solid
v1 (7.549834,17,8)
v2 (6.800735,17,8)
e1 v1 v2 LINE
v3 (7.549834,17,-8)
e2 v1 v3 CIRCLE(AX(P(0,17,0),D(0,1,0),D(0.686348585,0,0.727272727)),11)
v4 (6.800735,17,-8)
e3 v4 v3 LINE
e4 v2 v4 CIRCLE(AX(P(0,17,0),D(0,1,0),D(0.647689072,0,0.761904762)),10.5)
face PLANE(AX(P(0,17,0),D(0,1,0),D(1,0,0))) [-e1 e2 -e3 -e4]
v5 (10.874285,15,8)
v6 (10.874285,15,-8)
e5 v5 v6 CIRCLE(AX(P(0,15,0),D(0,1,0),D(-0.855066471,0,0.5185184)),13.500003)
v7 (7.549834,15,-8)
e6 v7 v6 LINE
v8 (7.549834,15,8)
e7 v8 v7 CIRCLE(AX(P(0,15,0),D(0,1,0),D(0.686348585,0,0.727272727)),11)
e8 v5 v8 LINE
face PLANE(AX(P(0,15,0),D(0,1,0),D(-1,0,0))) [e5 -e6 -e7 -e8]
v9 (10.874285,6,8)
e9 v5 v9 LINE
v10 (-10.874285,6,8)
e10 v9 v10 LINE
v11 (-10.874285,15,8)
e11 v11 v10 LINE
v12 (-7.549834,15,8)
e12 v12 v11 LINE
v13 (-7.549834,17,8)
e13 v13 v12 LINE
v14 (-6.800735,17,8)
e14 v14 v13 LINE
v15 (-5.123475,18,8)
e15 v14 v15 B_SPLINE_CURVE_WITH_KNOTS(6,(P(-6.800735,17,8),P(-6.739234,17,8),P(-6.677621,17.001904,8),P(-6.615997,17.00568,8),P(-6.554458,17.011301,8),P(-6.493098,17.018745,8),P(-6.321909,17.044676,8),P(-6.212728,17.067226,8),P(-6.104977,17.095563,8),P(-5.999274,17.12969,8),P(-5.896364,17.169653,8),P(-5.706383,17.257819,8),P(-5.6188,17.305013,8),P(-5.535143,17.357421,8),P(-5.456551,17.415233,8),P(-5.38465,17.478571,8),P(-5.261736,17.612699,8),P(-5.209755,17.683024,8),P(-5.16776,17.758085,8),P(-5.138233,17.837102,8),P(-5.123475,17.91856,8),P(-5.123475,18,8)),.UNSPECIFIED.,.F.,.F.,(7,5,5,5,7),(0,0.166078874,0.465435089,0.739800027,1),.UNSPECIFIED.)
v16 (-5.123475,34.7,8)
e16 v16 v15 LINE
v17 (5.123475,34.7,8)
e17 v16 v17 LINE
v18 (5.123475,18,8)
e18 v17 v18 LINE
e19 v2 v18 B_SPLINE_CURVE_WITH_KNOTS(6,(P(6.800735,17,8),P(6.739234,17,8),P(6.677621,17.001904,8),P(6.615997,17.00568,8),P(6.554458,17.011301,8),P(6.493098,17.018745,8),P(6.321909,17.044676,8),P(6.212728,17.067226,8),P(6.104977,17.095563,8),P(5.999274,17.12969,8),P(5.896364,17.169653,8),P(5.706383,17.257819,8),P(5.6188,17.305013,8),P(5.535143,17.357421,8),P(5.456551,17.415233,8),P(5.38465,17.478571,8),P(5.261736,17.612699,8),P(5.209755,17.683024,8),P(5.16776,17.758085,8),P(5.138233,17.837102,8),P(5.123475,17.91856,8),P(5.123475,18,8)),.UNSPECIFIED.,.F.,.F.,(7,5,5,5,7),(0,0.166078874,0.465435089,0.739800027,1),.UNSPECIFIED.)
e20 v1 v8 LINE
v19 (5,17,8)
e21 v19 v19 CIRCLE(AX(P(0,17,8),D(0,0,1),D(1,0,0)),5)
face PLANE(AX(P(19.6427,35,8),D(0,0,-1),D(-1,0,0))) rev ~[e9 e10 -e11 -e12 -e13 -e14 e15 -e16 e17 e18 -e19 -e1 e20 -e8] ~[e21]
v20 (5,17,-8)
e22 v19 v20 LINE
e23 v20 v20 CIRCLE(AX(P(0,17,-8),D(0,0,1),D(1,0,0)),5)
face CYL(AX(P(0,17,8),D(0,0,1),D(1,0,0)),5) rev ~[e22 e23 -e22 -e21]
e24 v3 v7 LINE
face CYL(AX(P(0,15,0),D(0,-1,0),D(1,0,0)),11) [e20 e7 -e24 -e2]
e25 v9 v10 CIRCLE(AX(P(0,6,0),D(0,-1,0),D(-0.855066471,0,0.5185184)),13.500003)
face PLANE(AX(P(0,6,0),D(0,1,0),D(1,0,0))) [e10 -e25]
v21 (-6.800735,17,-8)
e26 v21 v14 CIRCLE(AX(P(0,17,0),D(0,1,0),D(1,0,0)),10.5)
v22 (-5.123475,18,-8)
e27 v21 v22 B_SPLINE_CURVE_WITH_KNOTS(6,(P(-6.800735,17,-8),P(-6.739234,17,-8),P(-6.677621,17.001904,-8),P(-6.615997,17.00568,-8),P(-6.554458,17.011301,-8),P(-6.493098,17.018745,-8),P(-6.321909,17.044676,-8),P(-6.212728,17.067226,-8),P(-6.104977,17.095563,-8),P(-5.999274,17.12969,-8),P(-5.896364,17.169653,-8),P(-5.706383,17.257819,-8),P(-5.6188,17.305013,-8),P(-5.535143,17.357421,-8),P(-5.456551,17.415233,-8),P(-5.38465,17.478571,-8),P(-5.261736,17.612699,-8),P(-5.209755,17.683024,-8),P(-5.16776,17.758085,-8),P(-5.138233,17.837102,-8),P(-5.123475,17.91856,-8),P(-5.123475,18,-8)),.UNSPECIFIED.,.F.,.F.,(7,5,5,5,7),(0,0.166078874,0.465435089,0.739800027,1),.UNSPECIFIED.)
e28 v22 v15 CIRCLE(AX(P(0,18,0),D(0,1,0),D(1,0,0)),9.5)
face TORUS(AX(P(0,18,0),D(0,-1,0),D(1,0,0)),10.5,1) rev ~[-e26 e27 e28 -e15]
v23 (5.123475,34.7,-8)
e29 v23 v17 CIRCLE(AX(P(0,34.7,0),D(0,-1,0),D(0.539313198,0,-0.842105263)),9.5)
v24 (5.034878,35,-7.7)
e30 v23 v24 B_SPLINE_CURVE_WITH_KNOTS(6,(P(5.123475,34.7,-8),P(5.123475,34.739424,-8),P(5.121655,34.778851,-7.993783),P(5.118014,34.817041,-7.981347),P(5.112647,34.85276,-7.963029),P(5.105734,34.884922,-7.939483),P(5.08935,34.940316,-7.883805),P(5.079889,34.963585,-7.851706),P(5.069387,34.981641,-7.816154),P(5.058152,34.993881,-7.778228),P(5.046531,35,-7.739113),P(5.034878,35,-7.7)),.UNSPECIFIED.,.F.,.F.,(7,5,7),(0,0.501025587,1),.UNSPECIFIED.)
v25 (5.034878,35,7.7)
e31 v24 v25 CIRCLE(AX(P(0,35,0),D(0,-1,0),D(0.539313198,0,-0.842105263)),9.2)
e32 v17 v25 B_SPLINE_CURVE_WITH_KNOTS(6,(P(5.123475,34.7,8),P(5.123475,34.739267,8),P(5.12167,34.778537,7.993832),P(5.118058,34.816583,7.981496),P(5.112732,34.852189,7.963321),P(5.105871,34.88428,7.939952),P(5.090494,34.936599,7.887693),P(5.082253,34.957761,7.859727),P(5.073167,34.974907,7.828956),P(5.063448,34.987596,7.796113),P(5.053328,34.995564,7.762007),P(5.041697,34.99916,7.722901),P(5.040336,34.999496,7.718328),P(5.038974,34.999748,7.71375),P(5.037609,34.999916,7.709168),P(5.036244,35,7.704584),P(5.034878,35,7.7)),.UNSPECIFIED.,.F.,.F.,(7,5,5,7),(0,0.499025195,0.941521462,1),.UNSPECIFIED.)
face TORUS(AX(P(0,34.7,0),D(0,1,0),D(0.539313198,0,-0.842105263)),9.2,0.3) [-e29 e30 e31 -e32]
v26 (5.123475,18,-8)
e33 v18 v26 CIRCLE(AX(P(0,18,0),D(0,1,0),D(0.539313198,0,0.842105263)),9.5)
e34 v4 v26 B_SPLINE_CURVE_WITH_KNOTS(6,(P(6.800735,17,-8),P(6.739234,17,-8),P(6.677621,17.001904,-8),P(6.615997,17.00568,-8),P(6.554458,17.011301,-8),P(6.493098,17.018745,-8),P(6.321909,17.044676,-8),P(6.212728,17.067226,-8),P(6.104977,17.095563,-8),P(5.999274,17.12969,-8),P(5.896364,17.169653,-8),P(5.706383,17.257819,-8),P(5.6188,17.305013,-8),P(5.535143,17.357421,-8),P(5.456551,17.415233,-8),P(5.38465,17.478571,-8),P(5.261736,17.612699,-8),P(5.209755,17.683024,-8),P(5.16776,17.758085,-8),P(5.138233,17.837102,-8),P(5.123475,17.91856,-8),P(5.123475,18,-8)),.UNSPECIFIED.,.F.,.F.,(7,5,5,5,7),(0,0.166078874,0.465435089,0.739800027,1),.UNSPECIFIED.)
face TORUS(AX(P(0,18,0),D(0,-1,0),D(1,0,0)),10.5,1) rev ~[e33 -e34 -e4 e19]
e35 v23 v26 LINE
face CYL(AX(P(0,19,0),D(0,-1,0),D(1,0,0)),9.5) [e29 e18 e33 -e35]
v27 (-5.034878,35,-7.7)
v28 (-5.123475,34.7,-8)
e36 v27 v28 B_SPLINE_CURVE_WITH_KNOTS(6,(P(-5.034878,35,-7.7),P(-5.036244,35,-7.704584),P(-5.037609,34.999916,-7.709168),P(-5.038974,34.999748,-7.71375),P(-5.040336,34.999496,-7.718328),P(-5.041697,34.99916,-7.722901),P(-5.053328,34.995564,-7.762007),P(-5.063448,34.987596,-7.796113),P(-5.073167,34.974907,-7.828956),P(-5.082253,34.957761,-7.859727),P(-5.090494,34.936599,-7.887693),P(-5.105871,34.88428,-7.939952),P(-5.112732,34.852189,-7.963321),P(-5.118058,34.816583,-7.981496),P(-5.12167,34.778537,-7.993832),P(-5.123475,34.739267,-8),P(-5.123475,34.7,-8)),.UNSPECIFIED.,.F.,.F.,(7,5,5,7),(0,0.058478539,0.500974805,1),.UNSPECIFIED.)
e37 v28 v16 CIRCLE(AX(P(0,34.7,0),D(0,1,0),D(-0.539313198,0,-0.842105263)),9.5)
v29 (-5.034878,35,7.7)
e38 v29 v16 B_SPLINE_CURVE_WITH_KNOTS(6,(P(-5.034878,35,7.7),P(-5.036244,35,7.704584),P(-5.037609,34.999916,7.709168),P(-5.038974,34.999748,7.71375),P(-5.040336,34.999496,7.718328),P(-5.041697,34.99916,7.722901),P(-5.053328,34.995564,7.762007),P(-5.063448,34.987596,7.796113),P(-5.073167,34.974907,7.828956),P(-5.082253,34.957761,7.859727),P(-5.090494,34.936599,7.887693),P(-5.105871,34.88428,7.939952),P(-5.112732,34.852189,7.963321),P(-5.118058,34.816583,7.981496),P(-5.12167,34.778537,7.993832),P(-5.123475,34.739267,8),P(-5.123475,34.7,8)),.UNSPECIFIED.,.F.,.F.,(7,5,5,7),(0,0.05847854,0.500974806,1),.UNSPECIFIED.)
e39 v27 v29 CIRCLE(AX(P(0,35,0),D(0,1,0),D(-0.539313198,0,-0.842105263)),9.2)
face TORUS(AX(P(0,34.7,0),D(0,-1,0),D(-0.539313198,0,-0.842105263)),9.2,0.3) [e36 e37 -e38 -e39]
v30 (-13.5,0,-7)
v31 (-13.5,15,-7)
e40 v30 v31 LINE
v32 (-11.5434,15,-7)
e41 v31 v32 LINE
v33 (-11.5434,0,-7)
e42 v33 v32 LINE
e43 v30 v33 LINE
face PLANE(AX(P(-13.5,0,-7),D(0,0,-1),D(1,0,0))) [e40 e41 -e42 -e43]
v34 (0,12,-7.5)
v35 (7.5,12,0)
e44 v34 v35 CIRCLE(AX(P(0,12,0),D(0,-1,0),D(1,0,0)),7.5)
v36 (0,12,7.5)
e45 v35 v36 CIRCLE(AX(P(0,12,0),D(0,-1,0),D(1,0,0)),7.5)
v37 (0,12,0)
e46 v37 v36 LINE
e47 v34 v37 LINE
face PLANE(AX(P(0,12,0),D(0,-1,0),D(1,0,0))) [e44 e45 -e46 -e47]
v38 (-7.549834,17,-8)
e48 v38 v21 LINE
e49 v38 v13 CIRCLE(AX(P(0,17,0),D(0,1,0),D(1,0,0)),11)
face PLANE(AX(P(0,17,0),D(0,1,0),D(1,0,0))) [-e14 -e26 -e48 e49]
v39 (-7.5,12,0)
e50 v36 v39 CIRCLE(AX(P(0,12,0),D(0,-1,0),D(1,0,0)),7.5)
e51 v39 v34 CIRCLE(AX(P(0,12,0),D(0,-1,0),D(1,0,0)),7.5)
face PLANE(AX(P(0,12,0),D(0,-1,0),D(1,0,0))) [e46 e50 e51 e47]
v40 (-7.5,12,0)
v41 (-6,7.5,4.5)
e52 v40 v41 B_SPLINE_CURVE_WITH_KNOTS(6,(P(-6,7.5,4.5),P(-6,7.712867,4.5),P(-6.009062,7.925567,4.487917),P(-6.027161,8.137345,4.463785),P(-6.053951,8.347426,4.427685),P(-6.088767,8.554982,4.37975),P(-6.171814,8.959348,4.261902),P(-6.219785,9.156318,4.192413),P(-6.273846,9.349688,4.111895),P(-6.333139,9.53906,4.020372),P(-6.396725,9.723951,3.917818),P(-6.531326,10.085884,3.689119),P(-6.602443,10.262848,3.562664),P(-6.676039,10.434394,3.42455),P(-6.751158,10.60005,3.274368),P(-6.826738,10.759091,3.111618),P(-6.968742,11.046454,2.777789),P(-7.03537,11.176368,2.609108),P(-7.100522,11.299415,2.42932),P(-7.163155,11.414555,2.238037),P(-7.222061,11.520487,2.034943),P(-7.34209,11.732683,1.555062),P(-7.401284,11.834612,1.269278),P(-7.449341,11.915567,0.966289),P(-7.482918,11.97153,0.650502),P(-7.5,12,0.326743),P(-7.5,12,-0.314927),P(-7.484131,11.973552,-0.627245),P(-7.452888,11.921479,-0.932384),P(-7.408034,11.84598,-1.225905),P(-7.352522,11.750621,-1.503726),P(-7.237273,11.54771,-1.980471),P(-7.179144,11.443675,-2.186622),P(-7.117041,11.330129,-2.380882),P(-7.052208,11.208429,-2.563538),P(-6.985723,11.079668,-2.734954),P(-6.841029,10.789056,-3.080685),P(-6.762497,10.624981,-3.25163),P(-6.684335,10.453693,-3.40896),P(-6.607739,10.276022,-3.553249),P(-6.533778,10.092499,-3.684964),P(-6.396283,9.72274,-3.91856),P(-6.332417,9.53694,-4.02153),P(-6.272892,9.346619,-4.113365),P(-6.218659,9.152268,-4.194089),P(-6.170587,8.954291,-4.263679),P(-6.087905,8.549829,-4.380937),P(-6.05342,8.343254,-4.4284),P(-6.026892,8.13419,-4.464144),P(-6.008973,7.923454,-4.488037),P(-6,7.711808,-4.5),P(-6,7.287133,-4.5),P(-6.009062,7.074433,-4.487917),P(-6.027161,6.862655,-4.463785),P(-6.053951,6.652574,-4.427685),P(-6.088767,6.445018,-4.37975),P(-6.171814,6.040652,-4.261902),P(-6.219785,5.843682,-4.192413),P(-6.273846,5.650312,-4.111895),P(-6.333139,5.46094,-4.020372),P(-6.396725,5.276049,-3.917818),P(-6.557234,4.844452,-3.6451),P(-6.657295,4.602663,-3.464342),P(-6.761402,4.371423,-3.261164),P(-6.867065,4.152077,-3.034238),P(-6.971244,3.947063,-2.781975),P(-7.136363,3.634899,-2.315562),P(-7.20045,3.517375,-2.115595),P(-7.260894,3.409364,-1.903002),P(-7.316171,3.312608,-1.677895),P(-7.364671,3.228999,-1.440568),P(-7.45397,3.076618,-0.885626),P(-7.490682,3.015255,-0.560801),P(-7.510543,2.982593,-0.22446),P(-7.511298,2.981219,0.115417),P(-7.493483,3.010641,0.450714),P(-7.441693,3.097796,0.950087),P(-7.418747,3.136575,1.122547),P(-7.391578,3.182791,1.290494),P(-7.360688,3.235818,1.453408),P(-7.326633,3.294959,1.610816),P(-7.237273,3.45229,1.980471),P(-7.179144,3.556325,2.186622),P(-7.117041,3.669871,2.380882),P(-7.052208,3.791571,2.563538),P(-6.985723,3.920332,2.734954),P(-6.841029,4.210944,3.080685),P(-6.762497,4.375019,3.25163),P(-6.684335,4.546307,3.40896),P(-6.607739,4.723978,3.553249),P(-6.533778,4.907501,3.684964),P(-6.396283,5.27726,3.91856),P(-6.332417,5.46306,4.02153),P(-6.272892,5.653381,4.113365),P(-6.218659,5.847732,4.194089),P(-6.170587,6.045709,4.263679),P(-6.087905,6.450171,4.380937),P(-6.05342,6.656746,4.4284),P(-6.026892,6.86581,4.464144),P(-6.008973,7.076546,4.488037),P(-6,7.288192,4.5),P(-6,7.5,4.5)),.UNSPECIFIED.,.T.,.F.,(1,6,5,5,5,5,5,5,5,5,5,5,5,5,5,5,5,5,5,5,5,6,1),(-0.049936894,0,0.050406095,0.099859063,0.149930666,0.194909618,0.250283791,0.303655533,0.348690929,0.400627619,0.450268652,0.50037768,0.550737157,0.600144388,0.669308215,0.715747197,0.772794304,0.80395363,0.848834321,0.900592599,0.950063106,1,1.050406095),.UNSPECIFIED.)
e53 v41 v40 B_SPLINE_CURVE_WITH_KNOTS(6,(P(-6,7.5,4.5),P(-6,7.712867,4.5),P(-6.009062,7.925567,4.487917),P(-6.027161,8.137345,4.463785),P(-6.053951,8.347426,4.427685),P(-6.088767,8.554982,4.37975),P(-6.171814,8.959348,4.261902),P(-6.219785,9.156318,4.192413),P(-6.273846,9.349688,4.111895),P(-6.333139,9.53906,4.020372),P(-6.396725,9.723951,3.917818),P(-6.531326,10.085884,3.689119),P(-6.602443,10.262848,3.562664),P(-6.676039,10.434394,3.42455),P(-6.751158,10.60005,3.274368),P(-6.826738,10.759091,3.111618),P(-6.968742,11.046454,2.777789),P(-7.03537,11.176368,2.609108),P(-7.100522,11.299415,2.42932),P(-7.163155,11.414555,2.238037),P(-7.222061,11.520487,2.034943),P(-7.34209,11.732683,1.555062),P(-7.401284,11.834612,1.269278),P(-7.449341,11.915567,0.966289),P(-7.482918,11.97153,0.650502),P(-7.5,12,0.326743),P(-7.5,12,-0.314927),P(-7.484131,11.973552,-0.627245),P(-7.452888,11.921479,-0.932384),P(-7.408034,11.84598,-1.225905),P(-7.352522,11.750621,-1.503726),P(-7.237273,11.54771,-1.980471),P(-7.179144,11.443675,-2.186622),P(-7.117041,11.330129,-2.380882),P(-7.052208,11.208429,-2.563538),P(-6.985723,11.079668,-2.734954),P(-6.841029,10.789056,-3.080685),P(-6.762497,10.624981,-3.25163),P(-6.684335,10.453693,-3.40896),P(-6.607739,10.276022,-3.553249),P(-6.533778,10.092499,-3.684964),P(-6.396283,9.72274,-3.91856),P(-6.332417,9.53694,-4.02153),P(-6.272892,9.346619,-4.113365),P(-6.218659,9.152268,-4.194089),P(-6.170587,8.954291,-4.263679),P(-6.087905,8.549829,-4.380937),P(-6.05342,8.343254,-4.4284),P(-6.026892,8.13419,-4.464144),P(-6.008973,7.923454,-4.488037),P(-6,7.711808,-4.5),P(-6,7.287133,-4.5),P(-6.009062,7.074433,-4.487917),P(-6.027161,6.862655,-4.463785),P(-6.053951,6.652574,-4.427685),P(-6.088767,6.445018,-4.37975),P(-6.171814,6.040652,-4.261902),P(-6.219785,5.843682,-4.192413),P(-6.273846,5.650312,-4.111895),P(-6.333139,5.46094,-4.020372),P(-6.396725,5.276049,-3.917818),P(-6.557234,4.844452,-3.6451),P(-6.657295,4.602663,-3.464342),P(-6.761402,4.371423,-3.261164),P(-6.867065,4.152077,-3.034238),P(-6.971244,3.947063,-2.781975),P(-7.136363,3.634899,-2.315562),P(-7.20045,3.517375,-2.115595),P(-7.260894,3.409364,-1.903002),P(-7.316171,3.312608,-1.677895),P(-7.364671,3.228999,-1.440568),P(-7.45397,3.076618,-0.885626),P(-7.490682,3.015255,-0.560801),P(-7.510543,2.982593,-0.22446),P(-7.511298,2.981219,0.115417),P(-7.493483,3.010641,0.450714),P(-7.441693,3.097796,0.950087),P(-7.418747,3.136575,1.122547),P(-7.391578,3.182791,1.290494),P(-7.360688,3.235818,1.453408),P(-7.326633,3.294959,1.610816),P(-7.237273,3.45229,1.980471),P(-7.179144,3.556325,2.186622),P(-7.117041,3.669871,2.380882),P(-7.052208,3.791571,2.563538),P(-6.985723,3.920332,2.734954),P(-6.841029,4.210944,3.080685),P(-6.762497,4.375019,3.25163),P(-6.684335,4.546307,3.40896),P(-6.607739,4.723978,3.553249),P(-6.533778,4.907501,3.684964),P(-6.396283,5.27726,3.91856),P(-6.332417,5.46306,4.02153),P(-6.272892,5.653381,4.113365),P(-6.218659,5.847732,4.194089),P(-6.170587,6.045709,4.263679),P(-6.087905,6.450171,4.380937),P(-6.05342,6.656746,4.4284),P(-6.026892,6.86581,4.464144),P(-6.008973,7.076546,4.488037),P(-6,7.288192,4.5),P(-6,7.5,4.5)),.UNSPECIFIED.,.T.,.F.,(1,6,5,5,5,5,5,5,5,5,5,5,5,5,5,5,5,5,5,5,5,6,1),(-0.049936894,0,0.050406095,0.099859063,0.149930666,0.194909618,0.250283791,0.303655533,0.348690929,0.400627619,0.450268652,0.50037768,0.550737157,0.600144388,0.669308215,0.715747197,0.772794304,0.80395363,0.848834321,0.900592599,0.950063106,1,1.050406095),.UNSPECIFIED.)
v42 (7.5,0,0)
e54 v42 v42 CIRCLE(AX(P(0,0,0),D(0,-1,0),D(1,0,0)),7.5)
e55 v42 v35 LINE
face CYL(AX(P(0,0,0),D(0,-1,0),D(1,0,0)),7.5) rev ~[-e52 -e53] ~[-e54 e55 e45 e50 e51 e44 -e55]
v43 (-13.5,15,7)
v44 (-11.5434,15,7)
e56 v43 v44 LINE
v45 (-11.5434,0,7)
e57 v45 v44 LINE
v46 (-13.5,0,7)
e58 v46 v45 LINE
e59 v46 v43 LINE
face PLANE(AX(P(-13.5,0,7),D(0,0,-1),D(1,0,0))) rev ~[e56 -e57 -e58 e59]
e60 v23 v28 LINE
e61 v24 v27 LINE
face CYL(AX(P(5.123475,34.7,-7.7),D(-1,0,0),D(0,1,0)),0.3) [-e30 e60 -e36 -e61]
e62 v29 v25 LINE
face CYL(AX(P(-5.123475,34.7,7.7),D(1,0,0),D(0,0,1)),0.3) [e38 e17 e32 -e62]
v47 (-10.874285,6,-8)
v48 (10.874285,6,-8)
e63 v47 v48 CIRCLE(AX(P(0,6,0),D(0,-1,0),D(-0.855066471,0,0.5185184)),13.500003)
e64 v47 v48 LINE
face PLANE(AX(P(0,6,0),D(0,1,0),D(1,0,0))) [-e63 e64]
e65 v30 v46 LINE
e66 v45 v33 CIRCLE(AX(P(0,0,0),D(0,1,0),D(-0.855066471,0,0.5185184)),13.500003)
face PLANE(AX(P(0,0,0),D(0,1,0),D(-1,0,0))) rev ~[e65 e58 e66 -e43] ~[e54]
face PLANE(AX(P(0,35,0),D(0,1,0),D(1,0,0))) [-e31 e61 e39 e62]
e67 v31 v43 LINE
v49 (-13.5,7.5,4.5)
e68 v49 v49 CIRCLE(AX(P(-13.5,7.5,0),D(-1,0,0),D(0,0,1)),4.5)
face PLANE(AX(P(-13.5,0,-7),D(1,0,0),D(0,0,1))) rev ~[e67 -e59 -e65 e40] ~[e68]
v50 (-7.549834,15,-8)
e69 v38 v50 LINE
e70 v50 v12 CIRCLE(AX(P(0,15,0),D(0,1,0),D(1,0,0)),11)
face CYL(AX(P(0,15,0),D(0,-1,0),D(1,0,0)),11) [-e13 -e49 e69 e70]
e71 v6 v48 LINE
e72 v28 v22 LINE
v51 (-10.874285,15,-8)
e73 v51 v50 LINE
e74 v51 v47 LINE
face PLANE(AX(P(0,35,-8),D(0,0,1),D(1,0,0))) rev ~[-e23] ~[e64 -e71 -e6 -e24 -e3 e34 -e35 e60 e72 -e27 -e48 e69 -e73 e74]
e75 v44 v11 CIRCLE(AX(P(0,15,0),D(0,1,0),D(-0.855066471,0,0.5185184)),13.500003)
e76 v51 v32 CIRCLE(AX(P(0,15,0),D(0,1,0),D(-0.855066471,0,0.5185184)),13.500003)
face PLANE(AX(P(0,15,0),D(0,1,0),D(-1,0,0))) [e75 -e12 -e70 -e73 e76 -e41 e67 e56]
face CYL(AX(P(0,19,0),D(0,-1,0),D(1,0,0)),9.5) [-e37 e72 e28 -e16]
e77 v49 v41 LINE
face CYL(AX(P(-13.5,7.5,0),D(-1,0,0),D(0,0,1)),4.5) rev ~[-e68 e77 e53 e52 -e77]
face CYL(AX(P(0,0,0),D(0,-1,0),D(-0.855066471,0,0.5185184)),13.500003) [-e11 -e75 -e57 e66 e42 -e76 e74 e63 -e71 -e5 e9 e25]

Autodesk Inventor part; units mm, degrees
ref_plane "YZ Plane" through (0, 0, 0) normal (1, 0, 0) x (0, 1, 0)
ref_plane "XZ Plane" through (0, 0, 0) normal (0, 1, 0) x (-1, 0, 0)
ref_plane "XY Plane" through (0, 0, 0) normal (0, 0, 1) x (1, 0, 0)
sketch "Sketch1" plane through (0, 0, 0) normal (0, 1, 0) x (-1, 0, 0)
  arc A0 (11.5434, 7) -> (11.5434, -7) centre (0, 0) ccw
  line L0 (13.5, -7) -> (13.5, 7)
  line L1 (13.5, -7) -> (11.5434, -7)
  line L2 (13.5, 7) -> (11.5434, 7)
  dimension "d0" = 27
  dimension "d2" = 14
extrude "Extrusion1" add sketch "Sketch1" along normal blind 15
sketch "Sketch2" plane through (0, 15, 0) normal (0, 1, 0) x (1, 0, 0)
  arc A0 (-11.5434, -7) -> (-11.5434, 7) centre (0, 0) ccw projected
  circle A1 centre (0, 0) radius 11
  dimension "d6" = 22
extrude "Extrusion2" add sketch "Sketch2" along normal blind 2
sketch "Sketch3" plane through (0, 17, 0) normal (0, 1, 0) x (1, 0, 0)
  circle A0 centre (0, 0) radius 9.5
  dimension "d9" = 19
extrude "Extrusion3" add sketch "Sketch3" along normal blind 2
fillet "Fillet1" radius 1 1 edges at (-9.5, 17, 0)
sketch "Sketch4" plane through (0, 19, 0) normal (0, 1, 0) x (1, 0, 0)
  circle A0 centre (0, 0) radius 9.5 projected
  circle A1 centre (0, 0) radius 10
  dimension "d13" = 20
extrude "Extrusion4" add sketch "Sketch4" along normal blind 16 contours A0
sketch "Sketch5" plane through (0, 35, 0) normal (0, 1, 0) x (1, 0, 0)
  circle A0 centre (0, 0) radius 9.5 projected
  line L0 (0, 0) -> (8, 0) construction
  line L1 (0, -8) -> (-19.2017, -8)
  line L2 (-19.2017, -8) -> (-19.2017, -21.9067)
  line L3 (-19.2017, -21.9067) -> (19.6427, -21.9067)
  line L4 (19.6427, -21.9067) -> (19.6427, -8)
  line L5 (19.6427, -8) -> (0, -8)
  line L6 (0, 8) -> (-19.2017, 8)
  line L7 (-19.2017, 8) -> (-19.2017, 24.6239)
  line L8 (-19.2017, 24.6239) -> (24.0089, 24.6239)
  line L9 (0, 8) -> (27.6995, 8)
  line L10 (27.6995, 8) -> (27.6995, 24.6239)
  line L11 (27.6995, 24.6239) -> (24.0089, 24.6239)
extrude "Extrusion5" cut sketch "Sketch5" against normal blind 29 contours L9 L6 A0 | A0 L6 L7 L8 L11 L10 L9 | L5 L4 L3 L2 L1 A0 | A0 L1 L5
sketch "Sketch6" plane through (-13.5, 0, -7) normal (-1, 0, 0) x (0, 0, 1)
  circle A0 centre (7, 7.5) radius 4.5
  point P0 (7, 0)
  dimension "d21" = 9
extrude "Extrusion6" cut sketch "Sketch6" against normal blind 19
sketch "Sketch7" plane through (0, 0, 0) normal (0, -1, 0) x (1, 0, 0)
  circle A0 centre (0, 0) radius 7.5
  dimension "d26" = 15
extrude "Extrusion7" cut sketch "Sketch7" against normal blind 12
thread "Thread1" size "M10x1" class "6g" standard "ISO Metric profile" full length
thread "Thread2" size "M20x1" class "6g" standard "ISO Metric profile" full length
fillet "Fillet2" radius 0.3 4 edges at (9.5, 35, 0) (-9.5, 35, 0) (0, 35, 8) (0, 35, -8)
thread "Thread3" size "M8x0.8" class "6H" standard "ISO Metric profile" full length
sketch "Sketch8" plane through (-10.8743, 6, 8) normal (0, 0, 1) x (1, 0, 0)
  circle A0 centre (10.8743, 11) radius 5
  point P0 (10.8743, -6)
  dimension "d34" = 10
extrude "Extrusion8" cut sketch "Sketch8" against normal blind 20
sketch "Sketch9" plane through (0, 0, 0) normal (0, -1, 0) x (1, 0, 0)
  point P0 (0, 0)
properties part number "zadnji deo klipa" material "ABS Plastic"
